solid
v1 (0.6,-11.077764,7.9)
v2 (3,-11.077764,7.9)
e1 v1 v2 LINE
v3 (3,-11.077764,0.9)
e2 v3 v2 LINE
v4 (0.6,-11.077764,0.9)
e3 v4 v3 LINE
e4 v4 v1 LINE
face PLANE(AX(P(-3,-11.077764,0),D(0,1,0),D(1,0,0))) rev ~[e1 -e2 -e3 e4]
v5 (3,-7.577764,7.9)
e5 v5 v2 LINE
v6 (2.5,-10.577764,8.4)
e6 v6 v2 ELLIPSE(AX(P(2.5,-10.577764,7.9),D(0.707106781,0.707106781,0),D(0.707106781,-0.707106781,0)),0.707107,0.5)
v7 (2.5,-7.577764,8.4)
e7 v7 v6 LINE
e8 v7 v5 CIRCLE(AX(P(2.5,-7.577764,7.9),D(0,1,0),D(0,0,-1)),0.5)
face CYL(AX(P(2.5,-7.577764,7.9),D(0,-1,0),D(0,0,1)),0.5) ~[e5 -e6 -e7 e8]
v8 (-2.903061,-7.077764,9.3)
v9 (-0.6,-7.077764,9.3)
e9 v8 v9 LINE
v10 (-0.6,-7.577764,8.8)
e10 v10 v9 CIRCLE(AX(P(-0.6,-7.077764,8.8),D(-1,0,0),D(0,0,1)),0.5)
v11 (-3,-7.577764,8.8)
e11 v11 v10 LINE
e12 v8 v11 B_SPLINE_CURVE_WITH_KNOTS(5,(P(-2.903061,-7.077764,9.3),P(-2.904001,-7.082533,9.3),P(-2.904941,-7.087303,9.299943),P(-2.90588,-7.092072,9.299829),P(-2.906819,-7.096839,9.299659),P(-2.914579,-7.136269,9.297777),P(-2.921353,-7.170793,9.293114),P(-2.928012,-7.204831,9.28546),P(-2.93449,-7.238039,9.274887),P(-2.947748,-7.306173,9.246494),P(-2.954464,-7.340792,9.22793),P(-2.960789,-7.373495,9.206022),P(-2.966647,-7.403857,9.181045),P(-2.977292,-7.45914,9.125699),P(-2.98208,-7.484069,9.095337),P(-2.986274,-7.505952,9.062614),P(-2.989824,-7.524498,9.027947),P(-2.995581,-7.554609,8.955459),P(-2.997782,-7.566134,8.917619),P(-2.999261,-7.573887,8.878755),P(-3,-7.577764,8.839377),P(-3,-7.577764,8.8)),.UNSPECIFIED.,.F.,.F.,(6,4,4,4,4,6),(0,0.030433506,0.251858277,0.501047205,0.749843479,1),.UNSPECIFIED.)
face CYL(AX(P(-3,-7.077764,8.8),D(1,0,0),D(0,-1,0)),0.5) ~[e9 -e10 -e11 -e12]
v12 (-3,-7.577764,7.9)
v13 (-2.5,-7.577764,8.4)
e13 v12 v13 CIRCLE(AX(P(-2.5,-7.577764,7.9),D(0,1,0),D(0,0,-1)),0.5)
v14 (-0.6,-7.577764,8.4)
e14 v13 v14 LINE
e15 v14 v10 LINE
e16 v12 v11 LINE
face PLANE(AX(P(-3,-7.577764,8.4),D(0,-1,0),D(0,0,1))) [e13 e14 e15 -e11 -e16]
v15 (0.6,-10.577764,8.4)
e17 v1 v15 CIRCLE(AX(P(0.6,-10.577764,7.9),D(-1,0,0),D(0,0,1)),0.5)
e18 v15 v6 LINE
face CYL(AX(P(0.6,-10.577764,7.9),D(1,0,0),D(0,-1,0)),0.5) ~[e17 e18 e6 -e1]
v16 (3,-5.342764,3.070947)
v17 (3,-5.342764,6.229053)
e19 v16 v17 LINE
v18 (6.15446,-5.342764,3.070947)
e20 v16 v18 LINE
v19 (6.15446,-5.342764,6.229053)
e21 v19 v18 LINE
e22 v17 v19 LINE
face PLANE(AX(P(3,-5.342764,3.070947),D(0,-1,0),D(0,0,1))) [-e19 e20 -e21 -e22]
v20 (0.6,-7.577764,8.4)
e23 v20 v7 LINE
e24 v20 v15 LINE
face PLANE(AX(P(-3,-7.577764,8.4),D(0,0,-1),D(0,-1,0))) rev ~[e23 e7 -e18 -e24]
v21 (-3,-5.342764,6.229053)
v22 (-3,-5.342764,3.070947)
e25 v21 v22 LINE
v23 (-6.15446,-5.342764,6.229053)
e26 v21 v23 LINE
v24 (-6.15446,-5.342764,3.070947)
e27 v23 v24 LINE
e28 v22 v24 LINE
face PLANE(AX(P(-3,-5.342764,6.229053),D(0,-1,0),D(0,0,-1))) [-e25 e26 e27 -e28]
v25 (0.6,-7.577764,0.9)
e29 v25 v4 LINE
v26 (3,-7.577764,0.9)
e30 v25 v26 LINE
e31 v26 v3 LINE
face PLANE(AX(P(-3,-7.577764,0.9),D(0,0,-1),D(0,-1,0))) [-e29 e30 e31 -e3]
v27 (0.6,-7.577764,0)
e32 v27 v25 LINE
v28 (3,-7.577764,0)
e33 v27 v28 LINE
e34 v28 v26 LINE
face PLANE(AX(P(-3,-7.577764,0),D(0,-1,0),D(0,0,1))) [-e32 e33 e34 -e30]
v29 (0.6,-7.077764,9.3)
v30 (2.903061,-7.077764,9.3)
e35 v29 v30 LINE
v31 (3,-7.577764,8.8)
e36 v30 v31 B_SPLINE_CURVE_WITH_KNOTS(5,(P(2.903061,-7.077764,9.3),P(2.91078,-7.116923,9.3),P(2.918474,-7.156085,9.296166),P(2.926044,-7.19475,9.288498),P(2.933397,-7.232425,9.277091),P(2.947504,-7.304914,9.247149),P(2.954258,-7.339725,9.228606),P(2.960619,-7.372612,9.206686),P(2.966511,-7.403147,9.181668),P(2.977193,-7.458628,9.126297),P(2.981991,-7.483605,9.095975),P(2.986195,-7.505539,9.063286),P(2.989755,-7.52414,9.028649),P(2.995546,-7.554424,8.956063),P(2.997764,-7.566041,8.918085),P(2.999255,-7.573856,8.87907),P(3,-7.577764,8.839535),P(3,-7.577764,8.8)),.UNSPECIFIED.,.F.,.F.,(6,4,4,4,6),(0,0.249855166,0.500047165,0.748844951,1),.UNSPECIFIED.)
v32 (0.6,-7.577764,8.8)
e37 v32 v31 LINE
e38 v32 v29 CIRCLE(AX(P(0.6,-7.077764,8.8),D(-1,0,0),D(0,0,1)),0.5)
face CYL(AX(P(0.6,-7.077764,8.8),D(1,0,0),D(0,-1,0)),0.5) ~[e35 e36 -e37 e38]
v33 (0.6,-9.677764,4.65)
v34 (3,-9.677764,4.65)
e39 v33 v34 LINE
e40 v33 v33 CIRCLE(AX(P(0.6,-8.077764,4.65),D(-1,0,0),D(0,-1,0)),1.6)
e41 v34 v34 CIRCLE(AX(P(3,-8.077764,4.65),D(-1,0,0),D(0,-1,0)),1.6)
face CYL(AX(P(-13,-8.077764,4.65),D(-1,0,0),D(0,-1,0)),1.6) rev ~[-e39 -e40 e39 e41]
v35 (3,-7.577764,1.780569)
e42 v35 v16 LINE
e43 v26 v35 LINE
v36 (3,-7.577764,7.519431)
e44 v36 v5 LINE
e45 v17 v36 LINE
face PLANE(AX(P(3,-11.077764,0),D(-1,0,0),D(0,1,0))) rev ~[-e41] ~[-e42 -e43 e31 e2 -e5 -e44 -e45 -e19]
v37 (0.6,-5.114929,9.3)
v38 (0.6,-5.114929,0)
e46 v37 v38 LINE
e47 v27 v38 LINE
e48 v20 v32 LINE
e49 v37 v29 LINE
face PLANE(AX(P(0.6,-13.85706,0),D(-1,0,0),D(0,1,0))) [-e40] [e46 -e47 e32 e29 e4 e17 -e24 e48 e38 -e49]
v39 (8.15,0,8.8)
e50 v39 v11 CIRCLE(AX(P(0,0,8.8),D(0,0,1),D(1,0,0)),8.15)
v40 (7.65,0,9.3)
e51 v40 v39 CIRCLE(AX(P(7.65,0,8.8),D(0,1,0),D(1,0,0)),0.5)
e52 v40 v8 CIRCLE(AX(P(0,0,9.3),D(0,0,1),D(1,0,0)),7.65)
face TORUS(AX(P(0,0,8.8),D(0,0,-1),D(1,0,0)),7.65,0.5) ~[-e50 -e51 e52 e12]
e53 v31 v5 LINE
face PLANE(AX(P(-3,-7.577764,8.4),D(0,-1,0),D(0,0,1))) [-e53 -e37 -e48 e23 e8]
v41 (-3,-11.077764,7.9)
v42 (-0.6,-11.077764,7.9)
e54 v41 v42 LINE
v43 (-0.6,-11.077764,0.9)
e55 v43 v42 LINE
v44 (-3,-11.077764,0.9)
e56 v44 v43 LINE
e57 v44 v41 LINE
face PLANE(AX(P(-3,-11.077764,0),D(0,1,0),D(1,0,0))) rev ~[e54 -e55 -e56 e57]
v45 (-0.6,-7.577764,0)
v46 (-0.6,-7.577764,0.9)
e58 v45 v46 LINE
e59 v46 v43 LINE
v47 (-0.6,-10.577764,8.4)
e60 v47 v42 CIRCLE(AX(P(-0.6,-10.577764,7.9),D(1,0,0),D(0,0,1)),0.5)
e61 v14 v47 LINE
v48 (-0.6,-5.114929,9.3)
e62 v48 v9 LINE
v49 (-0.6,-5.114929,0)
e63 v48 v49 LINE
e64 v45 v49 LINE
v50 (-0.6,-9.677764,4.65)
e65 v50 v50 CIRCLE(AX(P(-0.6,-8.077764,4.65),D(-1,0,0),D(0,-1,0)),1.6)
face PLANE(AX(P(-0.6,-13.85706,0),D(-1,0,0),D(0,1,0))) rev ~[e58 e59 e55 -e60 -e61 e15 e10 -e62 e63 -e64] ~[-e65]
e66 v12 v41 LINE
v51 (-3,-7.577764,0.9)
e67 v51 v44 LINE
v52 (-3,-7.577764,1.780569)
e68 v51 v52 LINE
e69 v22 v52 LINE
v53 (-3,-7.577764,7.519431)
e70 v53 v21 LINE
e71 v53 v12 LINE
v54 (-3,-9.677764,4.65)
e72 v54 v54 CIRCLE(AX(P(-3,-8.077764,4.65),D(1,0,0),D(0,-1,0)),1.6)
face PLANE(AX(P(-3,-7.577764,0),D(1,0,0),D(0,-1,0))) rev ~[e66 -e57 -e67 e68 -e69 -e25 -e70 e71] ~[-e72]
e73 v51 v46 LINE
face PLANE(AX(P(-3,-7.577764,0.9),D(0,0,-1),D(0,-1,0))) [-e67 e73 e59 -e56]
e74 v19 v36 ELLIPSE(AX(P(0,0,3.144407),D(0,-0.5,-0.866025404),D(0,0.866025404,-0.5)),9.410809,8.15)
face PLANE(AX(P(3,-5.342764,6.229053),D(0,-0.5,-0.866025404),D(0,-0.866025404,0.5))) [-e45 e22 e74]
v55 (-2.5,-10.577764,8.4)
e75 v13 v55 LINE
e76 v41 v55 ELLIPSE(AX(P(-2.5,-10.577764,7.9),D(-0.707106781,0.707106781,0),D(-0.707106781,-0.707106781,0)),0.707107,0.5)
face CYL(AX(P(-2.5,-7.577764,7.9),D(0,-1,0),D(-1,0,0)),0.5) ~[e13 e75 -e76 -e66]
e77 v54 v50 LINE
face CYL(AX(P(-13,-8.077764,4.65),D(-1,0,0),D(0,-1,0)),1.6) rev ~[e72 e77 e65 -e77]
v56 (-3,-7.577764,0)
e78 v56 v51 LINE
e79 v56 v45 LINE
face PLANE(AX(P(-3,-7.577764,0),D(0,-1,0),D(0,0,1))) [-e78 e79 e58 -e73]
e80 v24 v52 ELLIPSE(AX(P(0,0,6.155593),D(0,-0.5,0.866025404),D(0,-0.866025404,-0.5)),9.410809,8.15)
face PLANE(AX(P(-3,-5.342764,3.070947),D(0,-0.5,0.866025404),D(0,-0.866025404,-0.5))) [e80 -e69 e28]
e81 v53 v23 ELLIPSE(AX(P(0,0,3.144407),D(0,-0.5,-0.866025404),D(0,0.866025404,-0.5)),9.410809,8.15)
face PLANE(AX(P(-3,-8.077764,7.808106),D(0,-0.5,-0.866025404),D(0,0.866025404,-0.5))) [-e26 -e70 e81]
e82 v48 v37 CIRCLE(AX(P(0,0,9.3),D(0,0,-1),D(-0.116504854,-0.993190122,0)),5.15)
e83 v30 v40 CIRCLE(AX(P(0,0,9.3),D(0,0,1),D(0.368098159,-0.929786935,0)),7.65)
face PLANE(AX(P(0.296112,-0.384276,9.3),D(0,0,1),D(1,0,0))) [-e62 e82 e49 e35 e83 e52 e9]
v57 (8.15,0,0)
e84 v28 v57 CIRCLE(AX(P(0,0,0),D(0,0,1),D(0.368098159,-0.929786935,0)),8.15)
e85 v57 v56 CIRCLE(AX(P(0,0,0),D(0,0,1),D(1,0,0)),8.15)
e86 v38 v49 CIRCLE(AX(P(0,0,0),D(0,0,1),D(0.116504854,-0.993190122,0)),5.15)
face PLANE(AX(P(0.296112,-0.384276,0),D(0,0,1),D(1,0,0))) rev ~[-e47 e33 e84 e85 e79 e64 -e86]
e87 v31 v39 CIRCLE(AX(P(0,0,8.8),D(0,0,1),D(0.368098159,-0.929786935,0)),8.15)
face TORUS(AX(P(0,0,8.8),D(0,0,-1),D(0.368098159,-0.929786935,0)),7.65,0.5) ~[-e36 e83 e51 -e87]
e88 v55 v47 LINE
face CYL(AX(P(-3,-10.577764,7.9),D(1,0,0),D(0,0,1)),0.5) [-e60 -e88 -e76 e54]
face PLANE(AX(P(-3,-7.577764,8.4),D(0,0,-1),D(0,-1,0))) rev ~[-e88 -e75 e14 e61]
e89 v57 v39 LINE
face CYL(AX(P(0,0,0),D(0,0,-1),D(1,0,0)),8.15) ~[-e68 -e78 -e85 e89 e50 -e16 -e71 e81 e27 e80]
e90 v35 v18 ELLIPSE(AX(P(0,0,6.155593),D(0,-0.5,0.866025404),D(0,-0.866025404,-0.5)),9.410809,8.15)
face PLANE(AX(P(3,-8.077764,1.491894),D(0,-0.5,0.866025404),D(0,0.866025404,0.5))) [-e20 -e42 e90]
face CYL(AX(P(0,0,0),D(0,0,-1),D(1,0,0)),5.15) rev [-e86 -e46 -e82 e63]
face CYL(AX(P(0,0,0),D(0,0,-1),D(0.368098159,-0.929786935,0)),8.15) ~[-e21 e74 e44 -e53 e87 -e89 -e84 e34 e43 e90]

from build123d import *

# Parameters (mm, degrees)
F0_R      = 5.15
F1_DEPTH  = 9.3
F2_W      = 1.2
F2_H      = 13.8570601121
F3_DEPTH  = 9.301
F4_W      = 3.5
F4_H      = 0.9
F5_DEPTH  = 25
F7_R      = 1.6
F8_DEPTH  = 21.151
F10_DEPTH = 25
F12_DEPTH = 25
F13_R     = 0.5


with BuildPart() as f1:
    # F0 (on Top) → F1 (new body)
    with BuildSketch(Plane.XY):
        with BuildLine():
            ThreePointArc((3, -7.5777635223), (6.7406416609, -4.5810752013), (8.15, 0))
            ThreePointArc((8.15, 0), (-4.5810752013, 6.7406416609), (-3, -7.5777635223))
            Line((-3, -7.5777635223), (3, -7.5777635223))
        make_face()
        Circle(F0_R, mode=Mode.SUBTRACT)
        with BuildLine():
            Line((3, -7.5777635223), (-3, -7.5777635223))
            ThreePointArc((-3, -7.5777635223), (0, -8.15), (3, -7.5777635223))
        make_face()
        with BuildLine():
            ThreePointArc((3, -7.5777635223), (0, -8.15), (-3, -7.5777635223))
            Line((-3, -7.5777635223), (-3, -11.0777635223))
            Line((-3, -11.0777635223), (3, -11.0777635223))
            Line((3, -11.0777635223), (3, -7.5777635223))
        make_face()
    extrude(amount=F1_DEPTH)

    # F2 (on Top) → F3 (cut, through all)
    with BuildSketch(Plane.XY):
        with Locations((0, -6.928530056)):
            Rectangle(F2_W, F2_H)
    extrude(amount=F3_DEPTH, mode=Mode.SUBTRACT)

    # F4 (on face) → F5 (cut)
    with BuildSketch(Plane(origin=(-3, 0, 0), x_dir=(0, -1, 0), z_dir=(-1, 0, 0))):
        with Locations((9.3277635223, 8.85)):
            Rectangle(F4_W, F4_H)
        with Locations((9.3277635223, 0.45)):
            Rectangle(F4_W, F4_H)
    extrude(amount=-F5_DEPTH, mode=Mode.SUBTRACT)

    # F7 (on offset) → F8 (cut, through all)
    with BuildSketch(Plane(origin=(-13, 0, 0), x_dir=(0, -1, 0), z_dir=(-1, 0, 0))):
        with Locations((8.0777635223, 4.65)):
            Circle(F7_R)
    extrude(amount=-F8_DEPTH, mode=Mode.SUBTRACT)

    # F9 (on face) → F10 (cut)
    with BuildSketch(Plane(origin=(-3, 0, 0), x_dir=(0, -1, 0), z_dir=(-1, 0, 0))):
        Polygon((10.8127635223, 6.2290529862), (8.0777635223, 7.8081059725), (5.3427635223, 6.2290529862), (5.3427635223, 3.0709470138), (8.0777635223, 1.4918940275), (10.8127635223, 3.0709470138), align=None)
    extrude(amount=F10_DEPTH, mode=Mode.SUBTRACT)

    # F11 (on face) → F12 (cut)
    with BuildSketch(Plane.YZ.offset(3)):
        Polygon((-5.3427635223, 3.0709470138), (-5.3427635223, 6.2290529862), (-8.0777635223, 7.8081059725), (-10.8127635223, 6.2290529862), (-10.8127635223, 3.0709470138), (-8.0777635223, 1.4918940275), align=None)
    extrude(amount=F12_DEPTH, mode=Mode.SUBTRACT)

    # F13
    f13_edges = [f1.edges().sort_by_distance(p)[0] for p in [
        (0, 8.15, 9.3),
        (3, -9.327764, 8.4),
        (-3, -9.327764, 8.4),
        (-1.8, -7.577764, 9.3),
        (1.8, -7.577764, 9.3),
        (1.8, -11.077764, 8.4),
        (-1.8, -11.077764, 8.4),
    ]]
    fillet(f13_edges, radius=F13_R)


solid = f1.part
